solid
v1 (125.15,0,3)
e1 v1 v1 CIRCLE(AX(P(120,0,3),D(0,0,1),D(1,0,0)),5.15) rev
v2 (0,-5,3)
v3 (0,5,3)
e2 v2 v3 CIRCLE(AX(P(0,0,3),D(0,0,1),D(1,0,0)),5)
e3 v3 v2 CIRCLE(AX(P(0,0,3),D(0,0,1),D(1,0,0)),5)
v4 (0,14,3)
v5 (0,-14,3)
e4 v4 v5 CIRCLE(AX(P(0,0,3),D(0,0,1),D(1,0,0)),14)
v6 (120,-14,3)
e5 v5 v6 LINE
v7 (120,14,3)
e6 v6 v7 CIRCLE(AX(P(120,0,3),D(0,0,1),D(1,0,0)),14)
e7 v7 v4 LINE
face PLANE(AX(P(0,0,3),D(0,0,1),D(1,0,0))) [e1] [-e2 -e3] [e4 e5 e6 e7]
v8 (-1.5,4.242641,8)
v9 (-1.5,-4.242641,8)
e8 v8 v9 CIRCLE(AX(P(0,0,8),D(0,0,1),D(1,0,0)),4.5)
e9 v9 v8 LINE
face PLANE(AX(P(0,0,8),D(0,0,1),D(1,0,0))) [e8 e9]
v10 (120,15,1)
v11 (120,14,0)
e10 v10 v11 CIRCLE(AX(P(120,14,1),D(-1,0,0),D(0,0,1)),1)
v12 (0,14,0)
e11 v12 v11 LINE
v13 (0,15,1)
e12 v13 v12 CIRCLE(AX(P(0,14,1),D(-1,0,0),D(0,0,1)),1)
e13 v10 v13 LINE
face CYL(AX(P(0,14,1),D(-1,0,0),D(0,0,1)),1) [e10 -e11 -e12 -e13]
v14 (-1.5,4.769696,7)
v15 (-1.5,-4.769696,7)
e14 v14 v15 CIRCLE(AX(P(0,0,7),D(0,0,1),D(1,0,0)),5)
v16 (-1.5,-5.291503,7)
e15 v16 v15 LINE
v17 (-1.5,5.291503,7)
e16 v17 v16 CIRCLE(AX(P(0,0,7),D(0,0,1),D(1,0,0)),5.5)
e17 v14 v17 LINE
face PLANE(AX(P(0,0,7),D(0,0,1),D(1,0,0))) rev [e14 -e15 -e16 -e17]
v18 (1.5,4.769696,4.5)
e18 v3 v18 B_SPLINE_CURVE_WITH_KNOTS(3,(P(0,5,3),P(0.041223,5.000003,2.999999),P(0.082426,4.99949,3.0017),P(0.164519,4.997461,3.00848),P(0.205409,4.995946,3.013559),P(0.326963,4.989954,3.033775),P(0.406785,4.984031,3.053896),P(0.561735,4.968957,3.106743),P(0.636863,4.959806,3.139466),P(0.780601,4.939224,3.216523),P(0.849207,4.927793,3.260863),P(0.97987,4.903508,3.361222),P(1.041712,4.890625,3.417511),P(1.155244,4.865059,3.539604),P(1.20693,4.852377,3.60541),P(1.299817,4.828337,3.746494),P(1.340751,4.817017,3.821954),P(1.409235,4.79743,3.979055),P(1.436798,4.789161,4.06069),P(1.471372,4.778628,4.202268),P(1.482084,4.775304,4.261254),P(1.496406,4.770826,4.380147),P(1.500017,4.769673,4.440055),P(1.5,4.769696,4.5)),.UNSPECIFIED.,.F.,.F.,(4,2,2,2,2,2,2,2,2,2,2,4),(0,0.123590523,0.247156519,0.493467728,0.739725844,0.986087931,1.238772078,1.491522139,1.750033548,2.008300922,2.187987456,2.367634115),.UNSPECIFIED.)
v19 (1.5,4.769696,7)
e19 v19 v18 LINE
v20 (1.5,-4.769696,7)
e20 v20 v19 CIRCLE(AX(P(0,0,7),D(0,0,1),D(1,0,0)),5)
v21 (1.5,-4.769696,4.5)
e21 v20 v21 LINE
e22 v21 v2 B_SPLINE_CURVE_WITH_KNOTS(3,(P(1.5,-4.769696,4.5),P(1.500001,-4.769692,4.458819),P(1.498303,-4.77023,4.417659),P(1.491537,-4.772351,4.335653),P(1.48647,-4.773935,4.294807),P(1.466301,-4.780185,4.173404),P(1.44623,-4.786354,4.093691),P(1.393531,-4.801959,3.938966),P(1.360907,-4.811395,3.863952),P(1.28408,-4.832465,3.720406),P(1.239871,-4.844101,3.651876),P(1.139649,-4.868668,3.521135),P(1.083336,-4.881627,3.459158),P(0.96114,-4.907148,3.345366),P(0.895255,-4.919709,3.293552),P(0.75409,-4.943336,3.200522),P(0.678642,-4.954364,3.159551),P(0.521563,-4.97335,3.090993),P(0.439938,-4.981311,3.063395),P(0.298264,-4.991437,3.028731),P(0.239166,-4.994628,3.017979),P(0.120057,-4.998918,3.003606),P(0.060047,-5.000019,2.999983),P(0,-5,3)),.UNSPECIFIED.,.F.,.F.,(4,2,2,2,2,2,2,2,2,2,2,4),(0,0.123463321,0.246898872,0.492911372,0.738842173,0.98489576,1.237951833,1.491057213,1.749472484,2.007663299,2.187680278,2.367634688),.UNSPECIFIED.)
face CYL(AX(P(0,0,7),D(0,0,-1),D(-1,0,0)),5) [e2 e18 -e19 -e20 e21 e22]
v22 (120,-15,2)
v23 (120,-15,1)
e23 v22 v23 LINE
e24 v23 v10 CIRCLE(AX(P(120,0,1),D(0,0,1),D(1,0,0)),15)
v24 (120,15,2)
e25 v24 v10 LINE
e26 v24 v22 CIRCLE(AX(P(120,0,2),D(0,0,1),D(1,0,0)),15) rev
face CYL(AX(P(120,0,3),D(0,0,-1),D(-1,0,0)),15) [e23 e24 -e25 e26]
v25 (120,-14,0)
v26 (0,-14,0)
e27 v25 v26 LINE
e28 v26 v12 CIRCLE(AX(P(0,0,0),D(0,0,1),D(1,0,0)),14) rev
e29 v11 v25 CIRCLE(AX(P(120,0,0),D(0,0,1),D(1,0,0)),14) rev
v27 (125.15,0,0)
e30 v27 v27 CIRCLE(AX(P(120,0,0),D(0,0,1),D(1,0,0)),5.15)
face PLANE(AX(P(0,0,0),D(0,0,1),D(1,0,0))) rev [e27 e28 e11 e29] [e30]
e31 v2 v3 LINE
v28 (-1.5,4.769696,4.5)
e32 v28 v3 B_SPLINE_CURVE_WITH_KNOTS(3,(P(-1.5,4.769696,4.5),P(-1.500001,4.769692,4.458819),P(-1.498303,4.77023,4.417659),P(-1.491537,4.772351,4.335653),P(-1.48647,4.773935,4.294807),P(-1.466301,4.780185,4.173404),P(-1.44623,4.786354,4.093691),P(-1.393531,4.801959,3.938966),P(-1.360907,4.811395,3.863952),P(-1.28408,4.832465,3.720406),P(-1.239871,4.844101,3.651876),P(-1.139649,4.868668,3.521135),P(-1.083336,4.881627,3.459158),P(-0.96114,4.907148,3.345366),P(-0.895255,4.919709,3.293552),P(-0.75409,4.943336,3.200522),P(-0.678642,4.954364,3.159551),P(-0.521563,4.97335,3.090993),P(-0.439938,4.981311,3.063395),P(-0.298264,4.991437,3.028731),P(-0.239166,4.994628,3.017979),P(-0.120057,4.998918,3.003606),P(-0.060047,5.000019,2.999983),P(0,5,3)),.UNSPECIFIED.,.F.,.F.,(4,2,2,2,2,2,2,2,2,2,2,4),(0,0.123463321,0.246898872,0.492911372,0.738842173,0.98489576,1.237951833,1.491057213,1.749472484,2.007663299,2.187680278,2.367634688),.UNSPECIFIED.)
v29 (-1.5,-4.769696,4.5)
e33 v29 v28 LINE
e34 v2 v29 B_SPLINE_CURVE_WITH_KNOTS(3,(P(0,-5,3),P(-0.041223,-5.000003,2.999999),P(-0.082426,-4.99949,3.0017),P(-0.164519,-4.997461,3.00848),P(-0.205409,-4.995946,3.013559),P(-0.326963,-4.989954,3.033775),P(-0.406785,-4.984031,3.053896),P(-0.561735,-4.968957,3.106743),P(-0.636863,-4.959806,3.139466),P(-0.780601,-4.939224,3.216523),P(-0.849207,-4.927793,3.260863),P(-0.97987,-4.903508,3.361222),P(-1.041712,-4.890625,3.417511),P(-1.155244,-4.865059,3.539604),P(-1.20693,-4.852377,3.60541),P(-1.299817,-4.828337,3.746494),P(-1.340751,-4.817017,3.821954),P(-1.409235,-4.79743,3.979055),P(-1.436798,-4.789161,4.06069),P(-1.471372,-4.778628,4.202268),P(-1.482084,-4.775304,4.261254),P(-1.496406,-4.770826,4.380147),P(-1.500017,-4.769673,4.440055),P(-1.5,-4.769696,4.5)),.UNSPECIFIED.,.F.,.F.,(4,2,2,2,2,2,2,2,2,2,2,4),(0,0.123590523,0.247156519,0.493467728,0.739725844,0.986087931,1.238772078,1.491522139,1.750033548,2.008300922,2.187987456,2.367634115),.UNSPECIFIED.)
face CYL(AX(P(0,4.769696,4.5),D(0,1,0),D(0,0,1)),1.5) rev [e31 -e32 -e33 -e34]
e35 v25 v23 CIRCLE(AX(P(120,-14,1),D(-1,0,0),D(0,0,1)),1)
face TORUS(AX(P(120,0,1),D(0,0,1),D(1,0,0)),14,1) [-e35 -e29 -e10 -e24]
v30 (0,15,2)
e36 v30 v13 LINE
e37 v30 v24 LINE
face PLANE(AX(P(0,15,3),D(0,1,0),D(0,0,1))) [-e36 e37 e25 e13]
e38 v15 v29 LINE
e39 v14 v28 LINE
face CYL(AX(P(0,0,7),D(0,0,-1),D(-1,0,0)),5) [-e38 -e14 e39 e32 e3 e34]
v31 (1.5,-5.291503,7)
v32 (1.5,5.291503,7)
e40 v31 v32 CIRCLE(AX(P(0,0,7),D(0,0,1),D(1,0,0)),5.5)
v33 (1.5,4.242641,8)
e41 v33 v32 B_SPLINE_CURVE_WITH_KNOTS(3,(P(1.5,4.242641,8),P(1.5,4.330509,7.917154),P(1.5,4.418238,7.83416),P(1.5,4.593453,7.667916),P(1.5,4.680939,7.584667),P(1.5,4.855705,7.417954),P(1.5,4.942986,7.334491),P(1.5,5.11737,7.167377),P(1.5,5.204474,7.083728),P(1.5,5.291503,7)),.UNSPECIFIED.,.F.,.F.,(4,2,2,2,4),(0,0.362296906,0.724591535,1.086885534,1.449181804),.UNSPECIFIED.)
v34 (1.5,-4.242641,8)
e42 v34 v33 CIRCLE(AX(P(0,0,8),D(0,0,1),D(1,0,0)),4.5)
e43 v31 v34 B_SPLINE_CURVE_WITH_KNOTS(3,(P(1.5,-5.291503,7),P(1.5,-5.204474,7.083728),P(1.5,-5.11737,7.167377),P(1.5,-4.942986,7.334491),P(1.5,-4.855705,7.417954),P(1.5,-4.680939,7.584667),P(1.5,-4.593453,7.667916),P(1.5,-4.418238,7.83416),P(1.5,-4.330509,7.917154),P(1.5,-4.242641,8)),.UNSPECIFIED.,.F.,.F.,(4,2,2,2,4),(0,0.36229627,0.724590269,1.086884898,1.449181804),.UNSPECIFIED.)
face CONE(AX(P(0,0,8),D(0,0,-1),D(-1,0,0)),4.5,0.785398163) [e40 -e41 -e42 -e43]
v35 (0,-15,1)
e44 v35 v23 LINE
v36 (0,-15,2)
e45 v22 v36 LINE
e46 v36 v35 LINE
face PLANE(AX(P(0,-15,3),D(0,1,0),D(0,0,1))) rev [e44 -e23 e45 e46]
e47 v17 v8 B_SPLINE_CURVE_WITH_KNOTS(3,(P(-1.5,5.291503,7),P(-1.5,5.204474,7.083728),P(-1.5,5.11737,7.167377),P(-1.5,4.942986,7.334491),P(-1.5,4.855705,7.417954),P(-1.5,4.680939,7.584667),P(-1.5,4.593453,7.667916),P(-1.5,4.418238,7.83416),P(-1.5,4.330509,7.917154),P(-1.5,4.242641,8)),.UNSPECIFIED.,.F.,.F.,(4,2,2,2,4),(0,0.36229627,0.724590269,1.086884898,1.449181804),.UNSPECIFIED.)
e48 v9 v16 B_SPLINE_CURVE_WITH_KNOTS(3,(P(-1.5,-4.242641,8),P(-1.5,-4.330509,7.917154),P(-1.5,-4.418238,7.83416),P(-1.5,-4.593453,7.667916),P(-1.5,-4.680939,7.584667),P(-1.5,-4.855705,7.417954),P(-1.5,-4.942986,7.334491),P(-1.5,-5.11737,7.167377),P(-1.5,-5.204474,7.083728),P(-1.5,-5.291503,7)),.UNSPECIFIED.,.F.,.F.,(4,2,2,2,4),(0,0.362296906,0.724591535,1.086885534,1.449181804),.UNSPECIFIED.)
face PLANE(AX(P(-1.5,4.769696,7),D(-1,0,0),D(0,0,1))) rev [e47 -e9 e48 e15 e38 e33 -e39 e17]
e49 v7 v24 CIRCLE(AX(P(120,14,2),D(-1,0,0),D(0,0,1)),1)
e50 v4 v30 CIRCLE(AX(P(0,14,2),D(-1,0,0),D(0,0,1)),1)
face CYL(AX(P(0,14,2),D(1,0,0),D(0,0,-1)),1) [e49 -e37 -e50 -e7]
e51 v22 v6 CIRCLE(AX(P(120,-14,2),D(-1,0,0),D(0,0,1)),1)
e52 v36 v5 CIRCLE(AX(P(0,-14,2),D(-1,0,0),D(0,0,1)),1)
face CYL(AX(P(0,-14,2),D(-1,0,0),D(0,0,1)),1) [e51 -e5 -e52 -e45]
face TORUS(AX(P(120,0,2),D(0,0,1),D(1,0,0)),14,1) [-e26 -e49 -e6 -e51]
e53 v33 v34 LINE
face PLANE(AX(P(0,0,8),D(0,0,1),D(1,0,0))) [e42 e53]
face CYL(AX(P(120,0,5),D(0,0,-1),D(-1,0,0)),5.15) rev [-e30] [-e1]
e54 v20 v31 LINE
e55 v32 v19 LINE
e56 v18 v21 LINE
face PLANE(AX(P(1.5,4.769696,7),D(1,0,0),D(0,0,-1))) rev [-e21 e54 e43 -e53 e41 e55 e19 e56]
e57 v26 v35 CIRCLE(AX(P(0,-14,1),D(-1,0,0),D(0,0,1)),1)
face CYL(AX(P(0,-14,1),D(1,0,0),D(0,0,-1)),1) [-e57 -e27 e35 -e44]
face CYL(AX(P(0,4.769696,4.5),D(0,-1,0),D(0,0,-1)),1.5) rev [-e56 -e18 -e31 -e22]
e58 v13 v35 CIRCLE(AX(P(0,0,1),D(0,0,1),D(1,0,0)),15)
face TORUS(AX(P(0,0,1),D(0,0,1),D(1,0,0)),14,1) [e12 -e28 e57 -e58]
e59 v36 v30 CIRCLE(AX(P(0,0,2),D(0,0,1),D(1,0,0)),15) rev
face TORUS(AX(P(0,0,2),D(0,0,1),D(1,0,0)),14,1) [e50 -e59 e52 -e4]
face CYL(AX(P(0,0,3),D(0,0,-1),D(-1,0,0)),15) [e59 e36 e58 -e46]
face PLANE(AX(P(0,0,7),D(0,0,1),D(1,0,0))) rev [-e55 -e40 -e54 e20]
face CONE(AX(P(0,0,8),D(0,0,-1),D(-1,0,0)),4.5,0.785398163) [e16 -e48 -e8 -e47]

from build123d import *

# Parameters (mm, degrees)
EXTRUDE_1_DEPTH     = 3
EXTRUDE_2_DEPTH     = 4
EXTRUDE_3_DEPTH     = 1
CHAMFER_1_SIZE      = 1
SKETCH_1_3_R        = 5.15
CUT_EXTRUDE_1_DEPTH = 5
FILLET_1_R          = 1.5
FILLET_2_R          = 1


with BuildPart() as part:
    # 草图1 → 凸台-拉伸1 (new body)
    with BuildSketch(Plane.XY):
        with BuildLine():
            Line((0, 15), (120, 15))
            ThreePointArc((120, 15), (135, 0), (120, -15))
            Line((120, -15), (0, -15))
            ThreePointArc((0, -15), (-15, 0), (0, 15))
        make_face()
    extrude(amount=EXTRUDE_1_DEPTH)

    # 草图2 → 凸台-拉伸2 (add)
    with BuildSketch(Plane.XY.offset(3)):
        with BuildLine():
            Line((-1.5, 4.769696007), (-1.5, -4.769696007))
            ThreePointArc((-1.5, -4.769696007), (-5, 0), (-1.5, 4.769696007))
        make_face()
        with BuildLine():
            Line((1.5, 4.769696007), (1.5, -4.769696007))
            ThreePointArc((1.5, -4.769696007), (5, 0), (1.5, 4.769696007))
        make_face()
    extrude(amount=EXTRUDE_2_DEPTH)

    # 草图5 → 凸台-拉伸3 (add)
    with BuildSketch(Plane.XY.offset(7)):
        with BuildLine():
            Line((-1.5, 5.291502622), (-1.5, -5.291502622))
            ThreePointArc((-1.5, -5.291502622), (-5.5, 0), (-1.5, 5.291502622))
        make_face()
        with BuildLine():
            Line((1.5, 5.291502622), (1.5, -5.291502622))
            ThreePointArc((1.5, -5.291502622), (5.5, 0), (1.5, 5.291502622))
        make_face()
    extrude(amount=EXTRUDE_3_DEPTH)

    # 倒角1
    chamfer_1_edges = [part.edges().sort_by_distance(p)[0] for p in [
        (5.5, 0, 8),
        (-5.5, 0, 8),
    ]]
    chamfer(chamfer_1_edges, length=CHAMFER_1_SIZE - 0.0001)  # a hair under: the kernel refuses the full size

    # 草图1<3> → 切除-拉伸1 (cut)
    with BuildSketch(Plane.XY):
        with Locations((120, 0)):
            Circle(SKETCH_1_3_R)
    extrude(amount=CUT_EXTRUDE_1_DEPTH, mode=Mode.SUBTRACT)

    # 圆角1
    fillet_1_edges = [part.edges().sort_by_distance(p)[0] for p in [
        (-1.5, 0, 3),
        (1.5, 0, 3),
    ]]
    fillet(fillet_1_edges, radius=FILLET_1_R - 0.0001)  # a hair under: the kernel refuses the full size

    # 圆角2
    fillet_2_edges = [part.edges().sort_by_distance(p)[0] for p in [
        (135, 0, 3),
        (60, 15, 3),
        (-15, 0, 3),
        (60, 15, 0),
        (135, 0, 0),
        (60, -15, 0),
        (-15, 0, 0),
        (60, -15, 3),
    ]]
    fillet(fillet_2_edges, radius=FILLET_2_R)


solid = part.part
